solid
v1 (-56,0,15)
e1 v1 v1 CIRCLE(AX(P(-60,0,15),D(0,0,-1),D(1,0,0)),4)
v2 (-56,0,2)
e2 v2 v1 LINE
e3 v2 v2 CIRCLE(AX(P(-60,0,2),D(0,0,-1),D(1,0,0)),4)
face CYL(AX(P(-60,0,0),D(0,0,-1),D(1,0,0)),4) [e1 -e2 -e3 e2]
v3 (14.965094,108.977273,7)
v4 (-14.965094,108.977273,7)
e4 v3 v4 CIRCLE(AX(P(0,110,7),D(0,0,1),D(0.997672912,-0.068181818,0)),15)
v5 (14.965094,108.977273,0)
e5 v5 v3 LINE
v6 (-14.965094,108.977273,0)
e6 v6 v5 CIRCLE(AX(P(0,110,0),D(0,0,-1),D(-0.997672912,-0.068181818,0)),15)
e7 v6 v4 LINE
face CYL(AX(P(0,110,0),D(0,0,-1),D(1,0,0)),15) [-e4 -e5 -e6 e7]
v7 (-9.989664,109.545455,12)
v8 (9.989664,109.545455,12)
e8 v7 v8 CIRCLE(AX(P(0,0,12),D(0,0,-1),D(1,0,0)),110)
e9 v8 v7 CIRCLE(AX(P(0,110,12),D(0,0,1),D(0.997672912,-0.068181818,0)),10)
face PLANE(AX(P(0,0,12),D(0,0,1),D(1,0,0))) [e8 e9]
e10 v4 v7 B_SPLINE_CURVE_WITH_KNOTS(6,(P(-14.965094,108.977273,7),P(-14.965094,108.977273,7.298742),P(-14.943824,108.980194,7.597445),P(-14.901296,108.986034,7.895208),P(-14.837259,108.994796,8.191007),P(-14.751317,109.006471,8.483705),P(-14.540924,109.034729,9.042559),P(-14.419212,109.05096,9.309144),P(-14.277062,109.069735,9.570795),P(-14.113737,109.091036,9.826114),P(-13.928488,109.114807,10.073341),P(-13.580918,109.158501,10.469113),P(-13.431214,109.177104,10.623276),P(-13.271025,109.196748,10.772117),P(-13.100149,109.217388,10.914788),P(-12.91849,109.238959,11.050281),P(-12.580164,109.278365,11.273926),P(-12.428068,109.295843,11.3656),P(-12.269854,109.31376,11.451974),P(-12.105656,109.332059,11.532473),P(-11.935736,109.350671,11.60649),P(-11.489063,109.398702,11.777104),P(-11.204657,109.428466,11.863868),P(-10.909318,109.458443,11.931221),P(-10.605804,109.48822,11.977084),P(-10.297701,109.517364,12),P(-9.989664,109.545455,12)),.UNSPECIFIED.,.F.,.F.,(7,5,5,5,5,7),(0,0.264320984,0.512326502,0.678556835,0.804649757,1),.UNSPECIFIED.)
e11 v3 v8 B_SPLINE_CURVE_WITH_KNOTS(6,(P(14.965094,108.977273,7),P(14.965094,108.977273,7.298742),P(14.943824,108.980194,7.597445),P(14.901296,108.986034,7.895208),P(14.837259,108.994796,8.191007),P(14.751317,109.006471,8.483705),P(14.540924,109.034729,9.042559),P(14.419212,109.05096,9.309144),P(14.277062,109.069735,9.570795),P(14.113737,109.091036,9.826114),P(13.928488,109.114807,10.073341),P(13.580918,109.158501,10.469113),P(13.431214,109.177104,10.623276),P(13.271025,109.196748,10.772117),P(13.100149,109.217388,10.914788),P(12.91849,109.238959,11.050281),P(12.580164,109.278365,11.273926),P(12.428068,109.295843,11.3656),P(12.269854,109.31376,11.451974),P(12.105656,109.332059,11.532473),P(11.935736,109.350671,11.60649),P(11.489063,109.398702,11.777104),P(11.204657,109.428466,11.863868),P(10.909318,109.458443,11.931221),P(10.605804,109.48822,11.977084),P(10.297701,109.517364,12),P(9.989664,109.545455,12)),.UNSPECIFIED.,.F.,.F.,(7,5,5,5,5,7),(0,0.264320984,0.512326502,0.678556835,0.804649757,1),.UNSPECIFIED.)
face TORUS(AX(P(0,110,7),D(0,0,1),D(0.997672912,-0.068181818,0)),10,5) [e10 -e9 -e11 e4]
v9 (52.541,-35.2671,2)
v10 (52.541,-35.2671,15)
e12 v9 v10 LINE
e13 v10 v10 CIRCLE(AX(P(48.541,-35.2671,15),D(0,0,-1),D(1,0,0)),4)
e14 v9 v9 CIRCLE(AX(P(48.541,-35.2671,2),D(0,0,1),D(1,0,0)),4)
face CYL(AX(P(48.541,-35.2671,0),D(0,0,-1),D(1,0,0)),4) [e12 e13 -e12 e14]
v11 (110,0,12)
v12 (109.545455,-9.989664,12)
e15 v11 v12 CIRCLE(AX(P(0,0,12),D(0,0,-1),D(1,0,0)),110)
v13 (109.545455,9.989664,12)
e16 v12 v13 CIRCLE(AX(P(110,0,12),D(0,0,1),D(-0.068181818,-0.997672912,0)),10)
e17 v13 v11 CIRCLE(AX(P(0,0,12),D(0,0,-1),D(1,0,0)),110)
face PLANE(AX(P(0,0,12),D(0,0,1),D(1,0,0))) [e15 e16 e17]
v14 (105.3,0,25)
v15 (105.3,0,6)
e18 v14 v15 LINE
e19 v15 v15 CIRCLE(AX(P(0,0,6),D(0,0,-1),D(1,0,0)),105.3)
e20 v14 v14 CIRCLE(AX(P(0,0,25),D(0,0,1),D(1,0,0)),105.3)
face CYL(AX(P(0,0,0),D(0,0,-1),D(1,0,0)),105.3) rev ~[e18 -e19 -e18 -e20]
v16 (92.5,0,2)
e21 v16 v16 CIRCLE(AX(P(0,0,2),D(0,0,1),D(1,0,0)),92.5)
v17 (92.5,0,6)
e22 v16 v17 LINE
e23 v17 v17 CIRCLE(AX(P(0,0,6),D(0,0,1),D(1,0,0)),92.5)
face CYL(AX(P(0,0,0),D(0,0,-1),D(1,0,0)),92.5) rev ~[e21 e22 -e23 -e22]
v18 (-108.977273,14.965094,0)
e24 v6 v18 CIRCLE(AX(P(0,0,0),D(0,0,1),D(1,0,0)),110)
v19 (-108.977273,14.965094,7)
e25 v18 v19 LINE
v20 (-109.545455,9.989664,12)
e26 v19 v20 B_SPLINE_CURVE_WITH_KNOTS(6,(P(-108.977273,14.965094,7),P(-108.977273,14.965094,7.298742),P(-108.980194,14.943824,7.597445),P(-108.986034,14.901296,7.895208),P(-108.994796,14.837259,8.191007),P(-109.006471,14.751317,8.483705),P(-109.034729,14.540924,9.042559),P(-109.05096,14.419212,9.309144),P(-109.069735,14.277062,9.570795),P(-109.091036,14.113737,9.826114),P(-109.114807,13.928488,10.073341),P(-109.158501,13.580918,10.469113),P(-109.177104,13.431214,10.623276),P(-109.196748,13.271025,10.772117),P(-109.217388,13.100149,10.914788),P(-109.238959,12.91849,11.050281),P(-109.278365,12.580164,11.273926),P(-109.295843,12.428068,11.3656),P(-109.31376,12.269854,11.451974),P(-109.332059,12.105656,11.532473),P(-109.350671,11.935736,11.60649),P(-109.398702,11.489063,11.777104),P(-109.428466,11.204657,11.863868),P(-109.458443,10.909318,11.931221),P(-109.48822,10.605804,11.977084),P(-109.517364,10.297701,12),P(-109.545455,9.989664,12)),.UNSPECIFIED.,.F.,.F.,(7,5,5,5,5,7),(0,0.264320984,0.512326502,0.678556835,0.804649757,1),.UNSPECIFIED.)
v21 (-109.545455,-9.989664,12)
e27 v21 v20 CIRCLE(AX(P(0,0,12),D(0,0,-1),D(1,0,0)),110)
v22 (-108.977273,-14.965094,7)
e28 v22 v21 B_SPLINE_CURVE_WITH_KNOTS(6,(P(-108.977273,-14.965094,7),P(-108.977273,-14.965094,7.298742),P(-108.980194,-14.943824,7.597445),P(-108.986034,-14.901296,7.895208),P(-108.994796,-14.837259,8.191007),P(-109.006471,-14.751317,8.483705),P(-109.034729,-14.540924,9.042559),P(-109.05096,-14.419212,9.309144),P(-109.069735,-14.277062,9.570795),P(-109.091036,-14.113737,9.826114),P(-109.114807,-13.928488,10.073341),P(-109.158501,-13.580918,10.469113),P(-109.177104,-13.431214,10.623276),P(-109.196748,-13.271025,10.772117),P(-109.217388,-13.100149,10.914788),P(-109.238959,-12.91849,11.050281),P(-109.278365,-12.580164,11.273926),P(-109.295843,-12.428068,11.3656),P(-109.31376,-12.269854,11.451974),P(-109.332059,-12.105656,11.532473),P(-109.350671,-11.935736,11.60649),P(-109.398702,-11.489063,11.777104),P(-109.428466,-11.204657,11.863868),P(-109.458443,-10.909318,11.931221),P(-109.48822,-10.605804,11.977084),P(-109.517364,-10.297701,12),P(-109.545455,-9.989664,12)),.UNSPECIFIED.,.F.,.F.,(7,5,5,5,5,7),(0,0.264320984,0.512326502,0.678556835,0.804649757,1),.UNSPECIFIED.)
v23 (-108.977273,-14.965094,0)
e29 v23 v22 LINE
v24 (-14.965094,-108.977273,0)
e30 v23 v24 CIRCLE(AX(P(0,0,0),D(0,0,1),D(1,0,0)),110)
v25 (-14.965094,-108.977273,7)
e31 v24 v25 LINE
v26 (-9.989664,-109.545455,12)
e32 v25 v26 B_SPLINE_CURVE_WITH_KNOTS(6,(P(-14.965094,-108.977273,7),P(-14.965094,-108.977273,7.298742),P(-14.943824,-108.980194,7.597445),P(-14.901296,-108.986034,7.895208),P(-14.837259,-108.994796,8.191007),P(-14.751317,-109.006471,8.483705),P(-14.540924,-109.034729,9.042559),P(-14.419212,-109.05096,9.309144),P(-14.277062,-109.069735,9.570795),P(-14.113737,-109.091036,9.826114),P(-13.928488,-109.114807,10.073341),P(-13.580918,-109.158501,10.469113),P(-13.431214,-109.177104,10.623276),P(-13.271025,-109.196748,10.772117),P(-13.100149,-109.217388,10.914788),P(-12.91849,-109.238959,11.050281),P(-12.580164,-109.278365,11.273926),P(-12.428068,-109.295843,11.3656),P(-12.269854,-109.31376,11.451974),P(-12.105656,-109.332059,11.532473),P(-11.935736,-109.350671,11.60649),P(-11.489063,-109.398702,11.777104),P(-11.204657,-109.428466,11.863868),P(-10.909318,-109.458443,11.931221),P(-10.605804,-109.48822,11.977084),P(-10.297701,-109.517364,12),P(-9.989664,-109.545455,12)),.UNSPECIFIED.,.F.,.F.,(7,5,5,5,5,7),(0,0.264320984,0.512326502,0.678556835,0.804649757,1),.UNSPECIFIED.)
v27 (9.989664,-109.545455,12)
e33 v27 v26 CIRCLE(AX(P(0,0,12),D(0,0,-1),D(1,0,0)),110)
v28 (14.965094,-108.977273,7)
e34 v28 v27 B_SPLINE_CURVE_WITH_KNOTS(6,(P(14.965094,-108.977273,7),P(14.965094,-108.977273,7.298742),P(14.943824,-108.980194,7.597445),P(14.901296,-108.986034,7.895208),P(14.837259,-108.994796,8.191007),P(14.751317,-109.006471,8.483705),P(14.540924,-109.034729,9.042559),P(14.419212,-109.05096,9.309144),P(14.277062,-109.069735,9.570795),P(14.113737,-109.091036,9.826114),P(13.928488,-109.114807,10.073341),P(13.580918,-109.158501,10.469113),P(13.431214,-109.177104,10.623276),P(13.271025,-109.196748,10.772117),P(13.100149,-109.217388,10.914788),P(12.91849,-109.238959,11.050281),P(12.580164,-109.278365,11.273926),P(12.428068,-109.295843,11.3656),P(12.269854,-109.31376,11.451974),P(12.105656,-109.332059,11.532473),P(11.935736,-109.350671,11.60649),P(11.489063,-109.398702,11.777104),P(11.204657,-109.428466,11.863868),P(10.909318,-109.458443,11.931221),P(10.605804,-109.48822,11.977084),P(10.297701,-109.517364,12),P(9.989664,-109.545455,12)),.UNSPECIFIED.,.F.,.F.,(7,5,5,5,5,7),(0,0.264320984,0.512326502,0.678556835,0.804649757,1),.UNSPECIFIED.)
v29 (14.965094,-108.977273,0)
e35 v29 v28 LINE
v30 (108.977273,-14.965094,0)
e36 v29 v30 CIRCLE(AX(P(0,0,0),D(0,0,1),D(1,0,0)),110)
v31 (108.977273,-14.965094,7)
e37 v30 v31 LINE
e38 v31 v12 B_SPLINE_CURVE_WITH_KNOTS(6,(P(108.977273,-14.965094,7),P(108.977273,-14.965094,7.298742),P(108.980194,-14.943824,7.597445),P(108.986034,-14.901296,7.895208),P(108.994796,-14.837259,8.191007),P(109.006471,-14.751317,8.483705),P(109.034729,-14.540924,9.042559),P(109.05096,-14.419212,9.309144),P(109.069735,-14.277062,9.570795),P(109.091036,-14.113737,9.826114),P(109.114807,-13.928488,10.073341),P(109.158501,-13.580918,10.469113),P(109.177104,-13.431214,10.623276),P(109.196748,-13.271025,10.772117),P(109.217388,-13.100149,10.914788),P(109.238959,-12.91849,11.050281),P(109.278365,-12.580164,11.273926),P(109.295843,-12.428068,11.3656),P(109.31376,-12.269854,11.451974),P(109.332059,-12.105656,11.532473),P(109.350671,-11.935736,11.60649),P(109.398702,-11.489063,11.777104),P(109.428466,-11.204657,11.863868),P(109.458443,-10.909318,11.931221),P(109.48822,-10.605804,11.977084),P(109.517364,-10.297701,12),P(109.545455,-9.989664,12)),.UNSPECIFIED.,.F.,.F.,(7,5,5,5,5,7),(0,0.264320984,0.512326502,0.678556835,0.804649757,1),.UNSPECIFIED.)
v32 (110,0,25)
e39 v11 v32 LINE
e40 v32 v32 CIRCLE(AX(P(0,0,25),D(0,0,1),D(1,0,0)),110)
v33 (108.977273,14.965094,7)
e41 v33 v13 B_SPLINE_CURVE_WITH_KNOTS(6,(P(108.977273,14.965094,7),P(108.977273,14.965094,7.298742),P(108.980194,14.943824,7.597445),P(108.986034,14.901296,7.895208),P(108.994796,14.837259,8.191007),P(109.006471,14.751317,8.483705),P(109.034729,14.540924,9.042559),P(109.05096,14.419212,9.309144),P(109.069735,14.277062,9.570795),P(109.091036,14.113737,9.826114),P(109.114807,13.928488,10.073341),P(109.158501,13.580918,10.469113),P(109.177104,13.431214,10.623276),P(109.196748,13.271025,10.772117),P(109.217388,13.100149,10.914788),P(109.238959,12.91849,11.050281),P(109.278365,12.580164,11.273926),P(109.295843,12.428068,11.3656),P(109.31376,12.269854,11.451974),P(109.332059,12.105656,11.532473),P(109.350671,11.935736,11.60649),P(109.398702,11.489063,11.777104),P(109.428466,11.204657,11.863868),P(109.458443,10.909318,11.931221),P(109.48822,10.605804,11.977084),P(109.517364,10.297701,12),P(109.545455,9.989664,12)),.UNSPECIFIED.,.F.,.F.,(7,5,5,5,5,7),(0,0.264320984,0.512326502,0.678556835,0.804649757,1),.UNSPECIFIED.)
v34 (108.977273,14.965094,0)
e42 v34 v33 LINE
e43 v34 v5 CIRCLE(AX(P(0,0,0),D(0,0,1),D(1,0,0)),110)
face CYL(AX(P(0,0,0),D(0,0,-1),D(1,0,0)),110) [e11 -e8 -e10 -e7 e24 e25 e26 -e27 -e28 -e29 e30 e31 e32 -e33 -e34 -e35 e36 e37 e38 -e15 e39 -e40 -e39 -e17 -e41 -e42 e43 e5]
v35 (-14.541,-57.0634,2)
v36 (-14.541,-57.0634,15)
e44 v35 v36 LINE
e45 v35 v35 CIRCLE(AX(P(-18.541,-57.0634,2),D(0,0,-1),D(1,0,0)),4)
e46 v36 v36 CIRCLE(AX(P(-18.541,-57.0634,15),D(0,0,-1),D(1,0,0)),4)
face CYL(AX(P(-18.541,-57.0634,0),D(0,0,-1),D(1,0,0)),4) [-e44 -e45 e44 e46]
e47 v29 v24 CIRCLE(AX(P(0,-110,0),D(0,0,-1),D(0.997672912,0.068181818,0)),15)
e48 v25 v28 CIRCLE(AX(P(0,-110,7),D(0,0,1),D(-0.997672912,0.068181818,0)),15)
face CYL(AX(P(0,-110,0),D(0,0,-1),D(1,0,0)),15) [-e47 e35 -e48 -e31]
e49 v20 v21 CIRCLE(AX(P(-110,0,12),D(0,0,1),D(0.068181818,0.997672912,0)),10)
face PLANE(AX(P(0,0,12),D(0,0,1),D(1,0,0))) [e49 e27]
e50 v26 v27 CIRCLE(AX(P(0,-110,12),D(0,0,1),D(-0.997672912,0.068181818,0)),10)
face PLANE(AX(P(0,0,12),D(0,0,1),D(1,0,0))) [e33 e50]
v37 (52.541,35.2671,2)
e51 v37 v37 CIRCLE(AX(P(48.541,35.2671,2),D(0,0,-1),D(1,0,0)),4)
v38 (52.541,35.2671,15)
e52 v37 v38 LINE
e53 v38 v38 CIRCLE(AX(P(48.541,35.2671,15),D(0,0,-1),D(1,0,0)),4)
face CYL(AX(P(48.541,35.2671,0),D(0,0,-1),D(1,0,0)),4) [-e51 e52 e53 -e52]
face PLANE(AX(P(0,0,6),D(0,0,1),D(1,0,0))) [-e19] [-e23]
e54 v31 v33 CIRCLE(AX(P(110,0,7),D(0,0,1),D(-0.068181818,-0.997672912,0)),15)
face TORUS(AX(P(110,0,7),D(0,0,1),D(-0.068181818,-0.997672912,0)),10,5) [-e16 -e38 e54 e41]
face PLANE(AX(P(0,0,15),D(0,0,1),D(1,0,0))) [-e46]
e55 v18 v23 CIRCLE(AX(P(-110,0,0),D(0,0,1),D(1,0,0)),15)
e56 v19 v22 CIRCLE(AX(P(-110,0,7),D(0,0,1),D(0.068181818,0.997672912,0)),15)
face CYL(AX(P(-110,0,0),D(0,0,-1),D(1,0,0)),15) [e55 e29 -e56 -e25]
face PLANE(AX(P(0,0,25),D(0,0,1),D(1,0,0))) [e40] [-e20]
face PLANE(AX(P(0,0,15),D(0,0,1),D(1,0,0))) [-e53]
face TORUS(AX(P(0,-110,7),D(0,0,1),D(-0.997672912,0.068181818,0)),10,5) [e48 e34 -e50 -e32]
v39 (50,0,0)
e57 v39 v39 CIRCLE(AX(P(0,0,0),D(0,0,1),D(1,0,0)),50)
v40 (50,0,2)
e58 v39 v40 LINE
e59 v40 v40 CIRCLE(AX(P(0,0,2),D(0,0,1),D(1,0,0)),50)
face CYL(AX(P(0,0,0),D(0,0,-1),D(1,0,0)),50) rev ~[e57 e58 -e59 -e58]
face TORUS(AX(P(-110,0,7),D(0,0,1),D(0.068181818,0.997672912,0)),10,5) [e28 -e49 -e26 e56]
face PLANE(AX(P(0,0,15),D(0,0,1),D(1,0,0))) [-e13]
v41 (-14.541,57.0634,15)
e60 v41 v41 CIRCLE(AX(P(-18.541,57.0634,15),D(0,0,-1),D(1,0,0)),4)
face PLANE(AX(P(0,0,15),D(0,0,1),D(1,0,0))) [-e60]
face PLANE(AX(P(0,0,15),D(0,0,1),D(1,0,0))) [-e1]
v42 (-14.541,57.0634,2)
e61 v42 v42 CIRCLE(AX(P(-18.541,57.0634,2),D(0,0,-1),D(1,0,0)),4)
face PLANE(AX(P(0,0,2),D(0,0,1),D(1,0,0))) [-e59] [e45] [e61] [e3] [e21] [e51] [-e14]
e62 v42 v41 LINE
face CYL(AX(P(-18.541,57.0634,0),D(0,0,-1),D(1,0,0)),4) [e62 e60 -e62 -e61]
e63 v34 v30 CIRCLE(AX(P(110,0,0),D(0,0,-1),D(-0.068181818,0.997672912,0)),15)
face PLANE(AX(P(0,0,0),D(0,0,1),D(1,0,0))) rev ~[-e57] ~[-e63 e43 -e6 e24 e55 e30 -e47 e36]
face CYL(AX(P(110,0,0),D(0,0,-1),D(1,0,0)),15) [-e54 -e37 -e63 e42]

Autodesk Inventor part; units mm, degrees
ref_plane "YZ Plane" through (0, 0, 0) normal (1, 0, 0) x (0, 1, 0)
ref_plane "XZ Plane" through (0, 0, 0) normal (0, 1, 0) x (-1, 0, 0)
ref_plane "XY Plane" through (0, 0, 0) normal (0, 0, 1) x (1, 0, 0)
sketch "Sketch1" plane through (0, 0, 0) normal (0, 0, 1) x (1, 0, 0)
  circle A0 centre (0, 0) radius 50
  circle A1 centre (0, 0) radius 60
  circle A2 centre (0, 0) radius 70
  circle A3 centre (-60, 0) radius 4
  circle A4 centre (-18.541, -57.0634) radius 4
  circle A5 centre (48.541, -35.2671) radius 4
  circle A6 centre (48.541, 35.2671) radius 4
  circle A7 centre (-18.541, 57.0634) radius 4
  circle A8 centre (0, 0) radius 105.3
  circle A9 centre (0, 0) radius 92.5
  circle A10 centre (0, 0) radius 99.25 construction
  line L0 (0, 0) -> (-99.25, 0) construction
  circle A11 centre (0, 0) radius 110
  circle A12 centre (-110, 0) radius 15
  circle A13 centre (0, -110) radius 15
  circle A14 centre (110, 0) radius 15
  circle A15 centre (0, 110) radius 15
  point P0 (-14.9651, -108.9773)
  point P1 (14.9651, -108.9773)
  point P2 (108.9773, -14.9651)
  point P3 (108.9773, 14.9651)
  point P4 (-14.9651, 108.9773)
  point P5 (14.9651, 108.9773)
  point P6 (-108.9773, -14.9651)
  point P7 (-108.9773, 14.9651)
  dimension "d1" = 120
  dimension "d14" = 198.5
  dimension "d22" = 220
  dimension "d0" = 100
  dimension "d2" = 140
  dimension "d3" = 8
  dimension "d6" = 360
  dimension "d12" = 210.6
  dimension "d13" = 185
  dimension "d25" = 30
  dimension "d28" = 360
extrude "Extrusion1" add sketch "Sketch1" along normal blind 2 contours A1 A5 A4 A3 A7 A6 | A2 | A9
extrude "Extrusion2" add sketch "Sketch1" along normal blind 15 contours A6 A1 | A1 A6 | A5 A1 | A1 A5 | A7 A1 | A1 A7 | A4 A1 | A1 A4 | A3 A1 | A1 A3
extrude "Extrusion3" add sketch "Sketch1" along normal blind 6 contours A8 A14 | A14 A8 A13 A12 A15 | A15 A8 | A8 A13 | A12 A8
extrude "Extrusion4" add sketch "Sketch1" along normal blind 12 contours A8 A14 A11 | A8 A15 A11 A14 | A14 A11 A13 A8 | A8 A15 A11 | A14 A11 | A13 A11 A8 | A8 A12 A11 A15 | A11 A15 | A13 A11 A12 A8 | A13 A11 | A8 A12 A11 | A11 A12
fillet "Fillet1" radius 5 4 edges at (-125, 0, 12) (0, -125, 12) (125, 0, 12) (0, 125, 12)
extrude "Extrusion5" add sketch "Sketch1" along normal blind 25 contours A8 A14 A11 | A8 A15 A11 A14 | A14 A11 A13 A8 | A8 A15 A11 | A13 A11 A8 | A8 A12 A11 A15 | A13 A11 A12 A8 | A8 A12 A11
properties part number "GroundPlate_Aperatus"
